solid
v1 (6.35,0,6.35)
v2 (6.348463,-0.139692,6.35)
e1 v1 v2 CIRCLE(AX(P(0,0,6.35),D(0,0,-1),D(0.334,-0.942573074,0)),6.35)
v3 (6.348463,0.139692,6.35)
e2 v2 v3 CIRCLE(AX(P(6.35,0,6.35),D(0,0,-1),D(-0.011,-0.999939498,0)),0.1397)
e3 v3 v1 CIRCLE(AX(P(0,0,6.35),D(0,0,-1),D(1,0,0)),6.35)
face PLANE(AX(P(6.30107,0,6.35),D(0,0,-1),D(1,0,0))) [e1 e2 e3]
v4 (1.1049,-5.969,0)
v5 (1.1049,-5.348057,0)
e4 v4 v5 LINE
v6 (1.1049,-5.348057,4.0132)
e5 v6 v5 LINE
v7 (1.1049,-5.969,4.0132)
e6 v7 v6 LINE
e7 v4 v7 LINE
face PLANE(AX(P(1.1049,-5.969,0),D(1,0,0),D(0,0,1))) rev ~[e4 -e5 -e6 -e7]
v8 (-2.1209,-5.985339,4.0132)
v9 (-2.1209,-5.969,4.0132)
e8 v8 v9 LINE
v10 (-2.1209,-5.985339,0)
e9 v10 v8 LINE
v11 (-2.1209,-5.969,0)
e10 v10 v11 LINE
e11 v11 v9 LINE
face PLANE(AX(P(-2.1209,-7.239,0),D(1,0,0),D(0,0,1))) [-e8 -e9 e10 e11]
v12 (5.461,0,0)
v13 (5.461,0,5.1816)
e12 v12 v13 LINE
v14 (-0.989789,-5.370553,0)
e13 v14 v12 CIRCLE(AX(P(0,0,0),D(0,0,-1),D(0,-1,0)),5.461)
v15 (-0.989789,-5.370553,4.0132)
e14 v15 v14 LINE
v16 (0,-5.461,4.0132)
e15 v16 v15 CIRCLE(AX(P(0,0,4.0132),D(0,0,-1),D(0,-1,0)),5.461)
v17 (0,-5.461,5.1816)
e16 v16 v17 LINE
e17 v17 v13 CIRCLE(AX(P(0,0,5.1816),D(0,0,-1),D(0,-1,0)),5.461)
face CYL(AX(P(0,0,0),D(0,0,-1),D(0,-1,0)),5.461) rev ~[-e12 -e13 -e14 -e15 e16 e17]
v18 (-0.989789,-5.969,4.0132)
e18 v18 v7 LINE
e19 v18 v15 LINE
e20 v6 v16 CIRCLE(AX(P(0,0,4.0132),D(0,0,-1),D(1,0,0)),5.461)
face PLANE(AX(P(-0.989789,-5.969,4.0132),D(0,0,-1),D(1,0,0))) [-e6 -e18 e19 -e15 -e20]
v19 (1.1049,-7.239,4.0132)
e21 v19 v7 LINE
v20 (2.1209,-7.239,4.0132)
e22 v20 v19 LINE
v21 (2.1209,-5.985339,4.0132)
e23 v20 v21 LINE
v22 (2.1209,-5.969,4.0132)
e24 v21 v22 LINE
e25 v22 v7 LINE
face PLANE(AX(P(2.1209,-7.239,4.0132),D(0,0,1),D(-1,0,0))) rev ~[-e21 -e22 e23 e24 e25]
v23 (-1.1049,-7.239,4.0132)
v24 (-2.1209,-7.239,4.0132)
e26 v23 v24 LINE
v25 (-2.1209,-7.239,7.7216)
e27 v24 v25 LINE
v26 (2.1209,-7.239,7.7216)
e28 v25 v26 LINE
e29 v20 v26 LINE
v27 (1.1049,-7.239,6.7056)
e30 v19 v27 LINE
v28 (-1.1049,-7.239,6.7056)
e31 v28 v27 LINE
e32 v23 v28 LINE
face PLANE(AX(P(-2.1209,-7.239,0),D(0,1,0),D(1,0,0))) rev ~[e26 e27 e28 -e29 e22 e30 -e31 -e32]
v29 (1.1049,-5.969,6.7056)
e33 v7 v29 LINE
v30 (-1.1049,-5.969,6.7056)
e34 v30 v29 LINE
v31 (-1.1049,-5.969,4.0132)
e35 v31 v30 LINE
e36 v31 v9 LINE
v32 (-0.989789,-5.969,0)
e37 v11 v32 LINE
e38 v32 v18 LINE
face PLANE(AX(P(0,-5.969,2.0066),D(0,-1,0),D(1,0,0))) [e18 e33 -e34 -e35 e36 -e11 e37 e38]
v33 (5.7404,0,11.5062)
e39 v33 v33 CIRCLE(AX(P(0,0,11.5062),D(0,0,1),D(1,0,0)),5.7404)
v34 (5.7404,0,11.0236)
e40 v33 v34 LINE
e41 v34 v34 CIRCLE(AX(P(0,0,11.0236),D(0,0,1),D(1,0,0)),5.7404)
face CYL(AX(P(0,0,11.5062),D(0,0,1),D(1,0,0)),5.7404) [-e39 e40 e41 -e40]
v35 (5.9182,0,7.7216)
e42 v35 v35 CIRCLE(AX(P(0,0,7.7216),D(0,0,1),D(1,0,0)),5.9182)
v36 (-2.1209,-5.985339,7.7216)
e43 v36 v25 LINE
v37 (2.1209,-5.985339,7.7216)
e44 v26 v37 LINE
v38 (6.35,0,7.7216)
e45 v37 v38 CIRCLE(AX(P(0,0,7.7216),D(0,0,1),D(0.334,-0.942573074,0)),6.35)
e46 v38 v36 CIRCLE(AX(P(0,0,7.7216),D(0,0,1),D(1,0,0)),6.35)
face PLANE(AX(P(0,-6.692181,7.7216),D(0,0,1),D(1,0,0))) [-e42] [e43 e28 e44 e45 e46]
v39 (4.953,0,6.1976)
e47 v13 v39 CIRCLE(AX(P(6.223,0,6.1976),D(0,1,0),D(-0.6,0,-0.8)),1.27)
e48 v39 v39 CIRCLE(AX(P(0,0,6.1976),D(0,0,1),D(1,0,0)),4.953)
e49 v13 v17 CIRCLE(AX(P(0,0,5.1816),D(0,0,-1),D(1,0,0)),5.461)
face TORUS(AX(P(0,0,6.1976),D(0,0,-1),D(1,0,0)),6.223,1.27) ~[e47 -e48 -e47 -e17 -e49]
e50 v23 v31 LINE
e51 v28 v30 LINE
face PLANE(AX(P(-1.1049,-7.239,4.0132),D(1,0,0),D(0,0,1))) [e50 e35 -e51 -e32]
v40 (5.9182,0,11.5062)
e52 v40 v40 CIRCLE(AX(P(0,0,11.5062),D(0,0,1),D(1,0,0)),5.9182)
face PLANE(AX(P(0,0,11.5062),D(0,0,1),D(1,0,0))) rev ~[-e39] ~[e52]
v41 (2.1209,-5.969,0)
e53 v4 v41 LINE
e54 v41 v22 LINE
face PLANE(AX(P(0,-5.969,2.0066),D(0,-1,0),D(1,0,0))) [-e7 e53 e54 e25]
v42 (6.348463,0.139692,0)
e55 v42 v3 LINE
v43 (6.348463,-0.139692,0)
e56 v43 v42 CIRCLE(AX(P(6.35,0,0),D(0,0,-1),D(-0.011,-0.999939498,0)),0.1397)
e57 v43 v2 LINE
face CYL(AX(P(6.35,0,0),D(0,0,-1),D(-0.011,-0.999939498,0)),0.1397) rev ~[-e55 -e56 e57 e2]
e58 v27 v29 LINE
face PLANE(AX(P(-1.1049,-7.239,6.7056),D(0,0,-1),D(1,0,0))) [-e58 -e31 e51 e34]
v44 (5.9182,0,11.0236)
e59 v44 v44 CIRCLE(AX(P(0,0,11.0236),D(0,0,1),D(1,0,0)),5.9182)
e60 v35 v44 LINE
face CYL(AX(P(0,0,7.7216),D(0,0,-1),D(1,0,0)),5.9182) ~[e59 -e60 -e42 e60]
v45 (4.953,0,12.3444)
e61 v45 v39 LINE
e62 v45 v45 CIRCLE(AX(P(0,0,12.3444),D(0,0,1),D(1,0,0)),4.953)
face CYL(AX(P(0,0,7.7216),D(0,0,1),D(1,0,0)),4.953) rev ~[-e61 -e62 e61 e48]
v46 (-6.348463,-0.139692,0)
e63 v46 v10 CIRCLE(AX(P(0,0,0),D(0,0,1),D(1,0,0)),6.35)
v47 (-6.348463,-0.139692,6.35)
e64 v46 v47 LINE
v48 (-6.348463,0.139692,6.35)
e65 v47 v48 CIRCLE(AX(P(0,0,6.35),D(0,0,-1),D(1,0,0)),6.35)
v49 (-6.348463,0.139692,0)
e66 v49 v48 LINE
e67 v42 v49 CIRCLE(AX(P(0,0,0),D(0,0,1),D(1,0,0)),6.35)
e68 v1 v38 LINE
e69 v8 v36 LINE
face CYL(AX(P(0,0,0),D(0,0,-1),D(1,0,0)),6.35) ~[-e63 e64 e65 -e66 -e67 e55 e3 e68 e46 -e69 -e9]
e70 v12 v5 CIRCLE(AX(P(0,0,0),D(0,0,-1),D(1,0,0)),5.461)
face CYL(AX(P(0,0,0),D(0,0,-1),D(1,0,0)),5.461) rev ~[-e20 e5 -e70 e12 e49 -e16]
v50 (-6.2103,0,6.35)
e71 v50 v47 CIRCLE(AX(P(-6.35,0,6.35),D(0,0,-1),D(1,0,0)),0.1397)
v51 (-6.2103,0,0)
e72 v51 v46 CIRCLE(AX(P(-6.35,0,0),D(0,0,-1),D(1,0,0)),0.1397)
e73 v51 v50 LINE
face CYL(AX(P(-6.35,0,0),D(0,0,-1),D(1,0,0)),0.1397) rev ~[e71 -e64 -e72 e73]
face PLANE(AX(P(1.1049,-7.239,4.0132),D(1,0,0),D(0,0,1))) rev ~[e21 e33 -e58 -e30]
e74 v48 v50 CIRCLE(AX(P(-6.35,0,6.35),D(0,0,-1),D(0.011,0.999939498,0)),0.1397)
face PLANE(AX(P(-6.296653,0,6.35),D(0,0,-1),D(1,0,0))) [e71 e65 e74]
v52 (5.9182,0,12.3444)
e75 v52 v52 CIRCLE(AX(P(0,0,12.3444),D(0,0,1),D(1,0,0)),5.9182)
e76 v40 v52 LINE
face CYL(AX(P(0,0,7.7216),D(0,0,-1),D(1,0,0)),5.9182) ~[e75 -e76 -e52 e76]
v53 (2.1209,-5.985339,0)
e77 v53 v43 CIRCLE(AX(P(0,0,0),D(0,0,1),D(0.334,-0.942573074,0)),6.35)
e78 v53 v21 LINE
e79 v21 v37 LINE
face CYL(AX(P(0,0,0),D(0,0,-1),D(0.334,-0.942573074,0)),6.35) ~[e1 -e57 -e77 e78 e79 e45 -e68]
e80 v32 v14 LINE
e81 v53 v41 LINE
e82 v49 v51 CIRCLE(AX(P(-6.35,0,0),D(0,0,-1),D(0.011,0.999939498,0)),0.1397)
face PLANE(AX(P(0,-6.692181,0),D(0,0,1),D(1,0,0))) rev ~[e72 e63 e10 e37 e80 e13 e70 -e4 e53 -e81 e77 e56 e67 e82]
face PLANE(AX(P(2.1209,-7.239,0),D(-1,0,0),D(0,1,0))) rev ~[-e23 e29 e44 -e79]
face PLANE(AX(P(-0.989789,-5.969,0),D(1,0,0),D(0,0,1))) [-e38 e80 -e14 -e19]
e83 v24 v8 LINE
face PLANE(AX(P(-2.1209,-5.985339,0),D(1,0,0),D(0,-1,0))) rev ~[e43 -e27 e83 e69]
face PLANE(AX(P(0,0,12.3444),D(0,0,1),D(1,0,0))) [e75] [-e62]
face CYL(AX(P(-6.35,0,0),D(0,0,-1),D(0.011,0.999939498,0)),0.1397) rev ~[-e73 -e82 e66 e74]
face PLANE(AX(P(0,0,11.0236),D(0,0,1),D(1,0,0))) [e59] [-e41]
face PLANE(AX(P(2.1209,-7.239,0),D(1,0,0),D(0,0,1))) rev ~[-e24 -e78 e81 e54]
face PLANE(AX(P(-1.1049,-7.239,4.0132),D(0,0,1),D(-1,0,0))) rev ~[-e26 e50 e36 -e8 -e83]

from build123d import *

# Parameters (mm, degrees)
F1_DEPTH      = 7.7216
F2_W          = 2.2098
F2_H          = 4.0132
F2_W_2        = 1.016
F2_H_2        = 2.6924
F3_DEPTH      = 1.27
F5_DEPTH      = 6.35
F6_R          = 5.9182
F6_R_2        = 4.953
F7_DEPTH      = 4.6228
F7_DEPTH_BACK = 2.54
F9_START      = -0.8382
F8_R          = 5.9182
F8_R_2        = 5.7404
F8_R_3        = 4.953
F9_DEPTH      = 0.4826
F11_W         = 2.0946894925
F11_H         = 4.0132
F12_DEPTH     = 0.6219426901


# Not quite as in the source:
# - a fillet or chamfer that OpenCascade refuses, or shapes differently, is made with other operations: its cross-section is extruded or revolved along the edge and cut away or added


with BuildPart() as f1:
    # F0 (on Top) → F1 (new body)
    with BuildSketch(Plane.XY):
        with BuildLine():
            ThreePointArc((2.1209, -5.9853390205), (0, -6.35), (-2.1209, -5.9853390205))
            Line((-2.1209, -5.9853390205), (-2.1209, -7.239))
            Line((-2.1209, -7.239), (2.1209, -7.239))
            Line((2.1209, -7.239), (2.1209, -5.9853390205))
        make_face()
        with BuildLine():
            Line((-2.1209, -5.461), (-2.1209, -5.9853390205))
            ThreePointArc((-2.1209, -5.9853390205), (0, -6.35), (2.1209, -5.9853390205))
            Line((2.1209, -5.9853390205), (2.1209, -5.461))
            Line((2.1209, -5.461), (0, -5.461))
            Line((0, -5.461), (-2.1209, -5.461))
        make_face()
        with BuildLine():
            ThreePointArc((2.1209, -5.9853390205), (5.1860493152, -3.6643406637), (6.35, 0))
            ThreePointArc((6.35, 0), (-3.6643406637, 5.1860493152), (-2.1209, -5.9853390205))
            Line((-2.1209, -5.9853390205), (-2.1209, -5.461))
            Line((-2.1209, -5.461), (0, -5.461))
            Line((0, -5.461), (2.1209, -5.461))
            Line((2.1209, -5.461), (2.1209, -5.9853390205))
        make_face()
        with BuildLine():
            ThreePointArc((5.461, 0), (3.8615101321, -3.8615101321), (0, -5.461))
            ThreePointArc((0, -5.461), (-3.8615101321, 3.8615101321), (5.461, 0))
        make_face(mode=Mode.SUBTRACT)
    extrude(amount=F1_DEPTH)

    # F2 (on face) → F3 (cut)
    with BuildSketch(Plane.XZ.offset(7.239)):
        with Locations((0, 2.0066)):
            Rectangle(F2_W, F2_H)
        with Locations((-1.6129, 2.0066)):
            Rectangle(F2_W_2, F2_H)
        with Locations((1.6129, 2.0066)):
            Rectangle(F2_W_2, F2_H)
        with Locations((0, 5.3594)):
            Rectangle(F2_W, F2_H_2)
    extrude(amount=-F3_DEPTH, mode=Mode.SUBTRACT)

    # F4 (on face) → F5 (cut)
    with BuildSketch(Plane(origin=(0, 0, 0), x_dir=(1, 0, 0), z_dir=(0, 0, -1))):
        with BuildLine():
            ThreePointArc((6.3484633, 0.1396915479), (6.2103, 0), (6.3484633, -0.1396915479))
            ThreePointArc((6.3484633, -0.1396915479), (6.35, 0), (6.3484633, 0.1396915479))
        make_face()
        with BuildLine():
            ThreePointArc((6.3484633, 0.1396915479), (6.35, 0), (6.3484633, -0.1396915479))
            ThreePointArc((6.3484633, -0.1396915479), (6.4482380095, -0.0993246369), (6.4897, 0))
            ThreePointArc((6.4897, 0), (6.4482380095, 0.0993246369), (6.3484633, 0.1396915479))
        make_face()
        with BuildLine():
            ThreePointArc((-6.3484633, -0.1396915479), (-6.2506753631, -0.0982380095), (-6.2103, 0))
            ThreePointArc((-6.2103, 0), (-6.2506753631, 0.0982380095), (-6.3484633, 0.1396915479))
            ThreePointArc((-6.3484633, 0.1396915479), (-6.35, 0), (-6.3484633, -0.1396915479))
        make_face()
        with BuildLine():
            ThreePointArc((-6.3484633, -0.1396915479), (-6.35, 0), (-6.3484633, 0.1396915479))
            ThreePointArc((-6.3484633, 0.1396915479), (-6.4897, 0), (-6.3484633, -0.1396915479))
        make_face()
    extrude(amount=-F5_DEPTH, mode=Mode.SUBTRACT)

    # F6 (on face) → F7 (join, two sides)
    with BuildSketch(Plane.XY.offset(7.7216)) as f7_sk:
        Circle(F6_R)
        Circle(F6_R_2, mode=Mode.SUBTRACT)
    extrude(amount=F7_DEPTH)
    extrude(f7_sk.sketch, amount=-F7_DEPTH_BACK)

    # F8 (on face) → F9 (cut)
    with BuildSketch(Plane.XY.offset(12.3444).offset(F9_START)):
        Circle(F8_R)
        Circle(F8_R_2, mode=Mode.SUBTRACT)
        Circle(F8_R_3)
    extrude(amount=-F9_DEPTH, mode=Mode.SUBTRACT)

    # F10: fillet of radius 1.27 on 1 edges, made by hand

    # F10_s1 → F10_t2 (revolve, cut)
    with BuildSketch(Plane.XZ):
        with BuildLine():
            ThreePointArc((5.461, 5.1816), (5.0870774674, 5.6296387337), (4.953, 6.1976))
            Line((4.953, 6.1976), (4.9276, 6.1976))
            Line((4.9276, 6.1976), (4.9276, 5.1816))
            Line((4.9276, 5.1816), (4.953, 5.1562))
            ThreePointArc((4.953, 5.1562), (5.207, 5.1562), (5.44576, 5.16128))
            Line((5.44576, 5.16128), (5.461, 5.1816))
        make_face()
    revolve(axis=Axis((0, 0, 5.1816), (0, 0, 1)), mode=Mode.SUBTRACT)

    # F11 (on face) → F12 (cut, through all)
    with BuildSketch(Plane.XZ.offset(5.969)):
        with Locations((0.0575552538, 2.0066)):
            Rectangle(F11_W, F11_H)
    extrude(amount=-F12_DEPTH, mode=Mode.SUBTRACT)


solid = f1.part
